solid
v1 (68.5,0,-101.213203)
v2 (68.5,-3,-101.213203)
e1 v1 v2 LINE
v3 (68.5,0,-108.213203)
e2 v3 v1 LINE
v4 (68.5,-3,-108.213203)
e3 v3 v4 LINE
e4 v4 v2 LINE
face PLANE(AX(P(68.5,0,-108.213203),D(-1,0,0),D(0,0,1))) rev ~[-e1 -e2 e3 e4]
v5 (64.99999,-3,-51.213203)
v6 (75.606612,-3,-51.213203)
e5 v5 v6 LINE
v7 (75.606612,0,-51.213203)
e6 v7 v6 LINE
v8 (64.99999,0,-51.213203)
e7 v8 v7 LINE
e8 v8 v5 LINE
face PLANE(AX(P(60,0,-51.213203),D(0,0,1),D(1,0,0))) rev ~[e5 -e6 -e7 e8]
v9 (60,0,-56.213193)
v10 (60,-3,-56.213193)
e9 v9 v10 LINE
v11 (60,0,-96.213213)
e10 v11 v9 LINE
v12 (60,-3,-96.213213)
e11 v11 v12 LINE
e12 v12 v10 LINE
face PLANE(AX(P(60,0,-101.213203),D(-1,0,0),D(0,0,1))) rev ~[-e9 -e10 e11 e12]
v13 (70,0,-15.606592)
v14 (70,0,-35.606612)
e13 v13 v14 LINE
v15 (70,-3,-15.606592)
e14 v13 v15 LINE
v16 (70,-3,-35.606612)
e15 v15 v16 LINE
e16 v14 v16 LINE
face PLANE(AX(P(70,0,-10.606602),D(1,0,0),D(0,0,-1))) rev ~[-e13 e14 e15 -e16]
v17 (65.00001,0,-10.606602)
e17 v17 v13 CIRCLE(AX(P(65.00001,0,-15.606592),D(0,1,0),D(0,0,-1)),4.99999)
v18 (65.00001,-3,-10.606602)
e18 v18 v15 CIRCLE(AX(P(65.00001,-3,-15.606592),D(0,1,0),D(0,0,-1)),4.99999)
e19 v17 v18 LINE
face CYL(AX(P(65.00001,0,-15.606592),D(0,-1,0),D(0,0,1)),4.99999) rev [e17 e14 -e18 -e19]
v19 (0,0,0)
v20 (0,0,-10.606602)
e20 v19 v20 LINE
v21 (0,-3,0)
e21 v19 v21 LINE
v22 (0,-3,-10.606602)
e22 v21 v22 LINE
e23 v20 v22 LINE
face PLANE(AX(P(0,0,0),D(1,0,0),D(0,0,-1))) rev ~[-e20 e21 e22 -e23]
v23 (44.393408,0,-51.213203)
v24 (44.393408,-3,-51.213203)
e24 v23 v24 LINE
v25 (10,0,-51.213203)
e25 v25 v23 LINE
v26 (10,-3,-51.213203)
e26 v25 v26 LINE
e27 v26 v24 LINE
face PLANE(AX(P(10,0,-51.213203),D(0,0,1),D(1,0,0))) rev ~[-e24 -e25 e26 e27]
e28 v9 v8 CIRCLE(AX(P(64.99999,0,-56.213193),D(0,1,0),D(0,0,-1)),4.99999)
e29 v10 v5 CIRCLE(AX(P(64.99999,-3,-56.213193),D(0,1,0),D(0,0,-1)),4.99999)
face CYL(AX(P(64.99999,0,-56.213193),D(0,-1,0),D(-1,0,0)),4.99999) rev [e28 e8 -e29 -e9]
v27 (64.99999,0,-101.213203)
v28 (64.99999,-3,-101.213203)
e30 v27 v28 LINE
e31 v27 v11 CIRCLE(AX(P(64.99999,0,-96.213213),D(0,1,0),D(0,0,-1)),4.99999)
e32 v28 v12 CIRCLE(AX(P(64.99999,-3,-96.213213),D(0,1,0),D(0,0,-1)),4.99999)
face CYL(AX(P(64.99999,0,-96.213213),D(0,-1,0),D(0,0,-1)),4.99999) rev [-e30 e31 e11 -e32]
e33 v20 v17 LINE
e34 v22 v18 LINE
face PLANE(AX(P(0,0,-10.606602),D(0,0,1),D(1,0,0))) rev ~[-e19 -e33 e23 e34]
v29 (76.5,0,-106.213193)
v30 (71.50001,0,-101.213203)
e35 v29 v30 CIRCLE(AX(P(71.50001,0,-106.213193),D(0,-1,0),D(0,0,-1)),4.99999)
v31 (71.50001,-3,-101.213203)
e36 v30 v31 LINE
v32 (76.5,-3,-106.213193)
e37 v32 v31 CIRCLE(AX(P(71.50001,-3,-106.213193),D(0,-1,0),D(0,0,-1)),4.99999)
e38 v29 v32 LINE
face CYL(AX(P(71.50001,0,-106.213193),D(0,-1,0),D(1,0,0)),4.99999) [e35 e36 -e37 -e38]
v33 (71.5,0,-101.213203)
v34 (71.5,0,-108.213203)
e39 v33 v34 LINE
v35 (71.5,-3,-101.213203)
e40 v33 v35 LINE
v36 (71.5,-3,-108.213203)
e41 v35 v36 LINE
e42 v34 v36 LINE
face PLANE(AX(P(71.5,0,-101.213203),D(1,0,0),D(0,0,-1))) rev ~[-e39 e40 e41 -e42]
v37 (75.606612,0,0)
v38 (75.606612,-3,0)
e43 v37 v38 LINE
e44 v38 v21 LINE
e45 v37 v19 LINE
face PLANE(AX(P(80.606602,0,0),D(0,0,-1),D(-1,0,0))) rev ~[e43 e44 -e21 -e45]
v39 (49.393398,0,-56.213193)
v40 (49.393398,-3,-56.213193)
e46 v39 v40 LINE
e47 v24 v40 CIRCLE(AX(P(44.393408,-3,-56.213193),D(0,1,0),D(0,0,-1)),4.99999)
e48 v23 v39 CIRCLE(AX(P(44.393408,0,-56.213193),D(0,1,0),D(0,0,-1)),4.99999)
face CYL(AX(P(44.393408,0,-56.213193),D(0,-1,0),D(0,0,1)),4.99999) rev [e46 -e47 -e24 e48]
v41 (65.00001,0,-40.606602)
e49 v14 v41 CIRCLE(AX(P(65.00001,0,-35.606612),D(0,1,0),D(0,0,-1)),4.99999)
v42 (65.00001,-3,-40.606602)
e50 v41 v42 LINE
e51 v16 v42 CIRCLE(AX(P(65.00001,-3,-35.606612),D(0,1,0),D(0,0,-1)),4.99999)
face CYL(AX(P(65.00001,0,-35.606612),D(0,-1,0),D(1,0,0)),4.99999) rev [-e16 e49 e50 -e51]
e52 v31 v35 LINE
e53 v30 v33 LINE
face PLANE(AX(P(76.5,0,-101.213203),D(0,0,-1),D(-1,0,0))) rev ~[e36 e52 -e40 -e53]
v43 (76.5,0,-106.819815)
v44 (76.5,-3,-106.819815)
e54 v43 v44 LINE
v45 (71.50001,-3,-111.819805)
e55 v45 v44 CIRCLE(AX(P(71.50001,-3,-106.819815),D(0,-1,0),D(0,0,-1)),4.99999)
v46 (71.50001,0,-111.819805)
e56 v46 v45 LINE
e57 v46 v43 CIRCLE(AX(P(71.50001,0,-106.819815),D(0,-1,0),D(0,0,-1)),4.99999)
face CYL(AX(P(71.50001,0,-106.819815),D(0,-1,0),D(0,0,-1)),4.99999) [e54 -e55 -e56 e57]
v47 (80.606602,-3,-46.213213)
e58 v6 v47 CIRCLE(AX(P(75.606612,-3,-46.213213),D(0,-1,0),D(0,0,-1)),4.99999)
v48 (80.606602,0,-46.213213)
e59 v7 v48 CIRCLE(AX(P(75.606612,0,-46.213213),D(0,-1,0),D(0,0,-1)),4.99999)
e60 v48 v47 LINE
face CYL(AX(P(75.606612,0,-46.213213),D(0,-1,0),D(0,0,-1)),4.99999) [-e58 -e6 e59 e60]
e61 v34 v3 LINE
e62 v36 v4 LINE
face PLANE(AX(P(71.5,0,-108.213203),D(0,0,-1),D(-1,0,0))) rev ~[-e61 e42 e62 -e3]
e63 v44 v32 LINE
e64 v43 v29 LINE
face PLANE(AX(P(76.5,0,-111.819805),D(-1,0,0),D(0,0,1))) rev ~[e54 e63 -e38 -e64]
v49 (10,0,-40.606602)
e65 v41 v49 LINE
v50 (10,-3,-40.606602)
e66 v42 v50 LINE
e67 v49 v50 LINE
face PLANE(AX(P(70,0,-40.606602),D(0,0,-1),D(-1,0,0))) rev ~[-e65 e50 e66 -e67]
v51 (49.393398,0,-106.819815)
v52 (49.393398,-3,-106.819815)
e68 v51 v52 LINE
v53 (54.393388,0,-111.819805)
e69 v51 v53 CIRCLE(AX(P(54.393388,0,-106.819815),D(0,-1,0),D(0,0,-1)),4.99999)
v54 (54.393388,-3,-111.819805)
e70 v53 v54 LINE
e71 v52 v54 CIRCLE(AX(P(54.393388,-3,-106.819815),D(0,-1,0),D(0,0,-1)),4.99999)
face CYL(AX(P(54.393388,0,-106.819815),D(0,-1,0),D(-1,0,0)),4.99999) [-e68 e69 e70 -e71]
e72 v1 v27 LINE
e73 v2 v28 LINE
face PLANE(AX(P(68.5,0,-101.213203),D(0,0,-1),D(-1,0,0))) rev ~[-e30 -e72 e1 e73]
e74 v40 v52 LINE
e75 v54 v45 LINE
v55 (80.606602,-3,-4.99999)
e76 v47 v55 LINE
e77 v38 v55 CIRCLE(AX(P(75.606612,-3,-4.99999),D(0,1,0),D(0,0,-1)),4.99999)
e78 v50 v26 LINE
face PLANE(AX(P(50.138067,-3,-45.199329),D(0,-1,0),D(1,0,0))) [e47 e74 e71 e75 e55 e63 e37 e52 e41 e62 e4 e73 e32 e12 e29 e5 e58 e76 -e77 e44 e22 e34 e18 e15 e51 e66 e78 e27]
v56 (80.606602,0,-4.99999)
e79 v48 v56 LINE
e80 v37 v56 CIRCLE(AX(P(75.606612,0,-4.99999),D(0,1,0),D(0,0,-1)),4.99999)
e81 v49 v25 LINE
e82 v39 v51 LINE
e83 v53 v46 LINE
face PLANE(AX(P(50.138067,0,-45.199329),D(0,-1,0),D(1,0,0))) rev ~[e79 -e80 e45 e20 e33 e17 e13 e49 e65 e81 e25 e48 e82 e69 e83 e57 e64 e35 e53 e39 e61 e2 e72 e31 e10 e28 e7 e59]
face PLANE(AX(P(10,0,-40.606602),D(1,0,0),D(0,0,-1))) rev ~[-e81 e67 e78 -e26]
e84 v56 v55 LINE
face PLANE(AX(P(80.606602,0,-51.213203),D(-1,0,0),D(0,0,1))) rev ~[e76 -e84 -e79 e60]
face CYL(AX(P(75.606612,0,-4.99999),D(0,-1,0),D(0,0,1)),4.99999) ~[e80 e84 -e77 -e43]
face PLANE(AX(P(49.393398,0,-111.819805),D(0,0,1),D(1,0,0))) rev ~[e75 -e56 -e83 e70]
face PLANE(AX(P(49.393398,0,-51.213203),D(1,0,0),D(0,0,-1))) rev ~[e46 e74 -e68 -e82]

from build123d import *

# Parameters (mm, degrees)
F1_DEPTH = 3
F2_R     = 4.99999


# Not quite as in the source:
# - a fillet or chamfer is up to 0.001 mm smaller than in the source, because OpenCascade refuses the exact size


with BuildPart() as f1:
    # F0 (on Front) → F1 (new body)
    with BuildSketch(Plane.XZ):
        Polygon((80.6066017178, 0), (0, 0), (0, -10.6066017178), (70, -10.6066017178), (70, -40.6066017178), (10, -40.6066017178), (10, -51.2132034356), (49.3933982822, -51.2132034356), (49.3933982822, -111.8198051534), (76.5, -111.8198051534), (76.5, -101.2132034356), (71.5, -101.2132034356), (71.5, -108.2132034356), (68.5, -108.2132034356), (68.5, -101.2132034356), (60, -101.2132034356), (60, -51.2132034356), (80.6066017178, -51.2132034356), align=None)
    extrude(amount=F1_DEPTH)

    # F2 (radius 5 in the source; OpenCascade refuses exactly that, so slightly less here)
    f2_edges = [f1.edges().sort_by_distance(p)[0] for p in [
        (49.393398, -1.5, -51.213203),
        (70, -1.5, -10.606602),
        (70, -1.5, -40.606602),
        (80.606602, -1.5, 0),
        (80.606602, -1.5, -51.213203),
        (60, -1.5, -51.213203),
        (60, -1.5, -101.213203),
        (76.5, -1.5, -101.213203),
        (76.5, -1.5, -111.819805),
        (49.393398, -1.5, -111.819805),
    ]]
    fillet(f2_edges, radius=F2_R)


solid = f1.part
